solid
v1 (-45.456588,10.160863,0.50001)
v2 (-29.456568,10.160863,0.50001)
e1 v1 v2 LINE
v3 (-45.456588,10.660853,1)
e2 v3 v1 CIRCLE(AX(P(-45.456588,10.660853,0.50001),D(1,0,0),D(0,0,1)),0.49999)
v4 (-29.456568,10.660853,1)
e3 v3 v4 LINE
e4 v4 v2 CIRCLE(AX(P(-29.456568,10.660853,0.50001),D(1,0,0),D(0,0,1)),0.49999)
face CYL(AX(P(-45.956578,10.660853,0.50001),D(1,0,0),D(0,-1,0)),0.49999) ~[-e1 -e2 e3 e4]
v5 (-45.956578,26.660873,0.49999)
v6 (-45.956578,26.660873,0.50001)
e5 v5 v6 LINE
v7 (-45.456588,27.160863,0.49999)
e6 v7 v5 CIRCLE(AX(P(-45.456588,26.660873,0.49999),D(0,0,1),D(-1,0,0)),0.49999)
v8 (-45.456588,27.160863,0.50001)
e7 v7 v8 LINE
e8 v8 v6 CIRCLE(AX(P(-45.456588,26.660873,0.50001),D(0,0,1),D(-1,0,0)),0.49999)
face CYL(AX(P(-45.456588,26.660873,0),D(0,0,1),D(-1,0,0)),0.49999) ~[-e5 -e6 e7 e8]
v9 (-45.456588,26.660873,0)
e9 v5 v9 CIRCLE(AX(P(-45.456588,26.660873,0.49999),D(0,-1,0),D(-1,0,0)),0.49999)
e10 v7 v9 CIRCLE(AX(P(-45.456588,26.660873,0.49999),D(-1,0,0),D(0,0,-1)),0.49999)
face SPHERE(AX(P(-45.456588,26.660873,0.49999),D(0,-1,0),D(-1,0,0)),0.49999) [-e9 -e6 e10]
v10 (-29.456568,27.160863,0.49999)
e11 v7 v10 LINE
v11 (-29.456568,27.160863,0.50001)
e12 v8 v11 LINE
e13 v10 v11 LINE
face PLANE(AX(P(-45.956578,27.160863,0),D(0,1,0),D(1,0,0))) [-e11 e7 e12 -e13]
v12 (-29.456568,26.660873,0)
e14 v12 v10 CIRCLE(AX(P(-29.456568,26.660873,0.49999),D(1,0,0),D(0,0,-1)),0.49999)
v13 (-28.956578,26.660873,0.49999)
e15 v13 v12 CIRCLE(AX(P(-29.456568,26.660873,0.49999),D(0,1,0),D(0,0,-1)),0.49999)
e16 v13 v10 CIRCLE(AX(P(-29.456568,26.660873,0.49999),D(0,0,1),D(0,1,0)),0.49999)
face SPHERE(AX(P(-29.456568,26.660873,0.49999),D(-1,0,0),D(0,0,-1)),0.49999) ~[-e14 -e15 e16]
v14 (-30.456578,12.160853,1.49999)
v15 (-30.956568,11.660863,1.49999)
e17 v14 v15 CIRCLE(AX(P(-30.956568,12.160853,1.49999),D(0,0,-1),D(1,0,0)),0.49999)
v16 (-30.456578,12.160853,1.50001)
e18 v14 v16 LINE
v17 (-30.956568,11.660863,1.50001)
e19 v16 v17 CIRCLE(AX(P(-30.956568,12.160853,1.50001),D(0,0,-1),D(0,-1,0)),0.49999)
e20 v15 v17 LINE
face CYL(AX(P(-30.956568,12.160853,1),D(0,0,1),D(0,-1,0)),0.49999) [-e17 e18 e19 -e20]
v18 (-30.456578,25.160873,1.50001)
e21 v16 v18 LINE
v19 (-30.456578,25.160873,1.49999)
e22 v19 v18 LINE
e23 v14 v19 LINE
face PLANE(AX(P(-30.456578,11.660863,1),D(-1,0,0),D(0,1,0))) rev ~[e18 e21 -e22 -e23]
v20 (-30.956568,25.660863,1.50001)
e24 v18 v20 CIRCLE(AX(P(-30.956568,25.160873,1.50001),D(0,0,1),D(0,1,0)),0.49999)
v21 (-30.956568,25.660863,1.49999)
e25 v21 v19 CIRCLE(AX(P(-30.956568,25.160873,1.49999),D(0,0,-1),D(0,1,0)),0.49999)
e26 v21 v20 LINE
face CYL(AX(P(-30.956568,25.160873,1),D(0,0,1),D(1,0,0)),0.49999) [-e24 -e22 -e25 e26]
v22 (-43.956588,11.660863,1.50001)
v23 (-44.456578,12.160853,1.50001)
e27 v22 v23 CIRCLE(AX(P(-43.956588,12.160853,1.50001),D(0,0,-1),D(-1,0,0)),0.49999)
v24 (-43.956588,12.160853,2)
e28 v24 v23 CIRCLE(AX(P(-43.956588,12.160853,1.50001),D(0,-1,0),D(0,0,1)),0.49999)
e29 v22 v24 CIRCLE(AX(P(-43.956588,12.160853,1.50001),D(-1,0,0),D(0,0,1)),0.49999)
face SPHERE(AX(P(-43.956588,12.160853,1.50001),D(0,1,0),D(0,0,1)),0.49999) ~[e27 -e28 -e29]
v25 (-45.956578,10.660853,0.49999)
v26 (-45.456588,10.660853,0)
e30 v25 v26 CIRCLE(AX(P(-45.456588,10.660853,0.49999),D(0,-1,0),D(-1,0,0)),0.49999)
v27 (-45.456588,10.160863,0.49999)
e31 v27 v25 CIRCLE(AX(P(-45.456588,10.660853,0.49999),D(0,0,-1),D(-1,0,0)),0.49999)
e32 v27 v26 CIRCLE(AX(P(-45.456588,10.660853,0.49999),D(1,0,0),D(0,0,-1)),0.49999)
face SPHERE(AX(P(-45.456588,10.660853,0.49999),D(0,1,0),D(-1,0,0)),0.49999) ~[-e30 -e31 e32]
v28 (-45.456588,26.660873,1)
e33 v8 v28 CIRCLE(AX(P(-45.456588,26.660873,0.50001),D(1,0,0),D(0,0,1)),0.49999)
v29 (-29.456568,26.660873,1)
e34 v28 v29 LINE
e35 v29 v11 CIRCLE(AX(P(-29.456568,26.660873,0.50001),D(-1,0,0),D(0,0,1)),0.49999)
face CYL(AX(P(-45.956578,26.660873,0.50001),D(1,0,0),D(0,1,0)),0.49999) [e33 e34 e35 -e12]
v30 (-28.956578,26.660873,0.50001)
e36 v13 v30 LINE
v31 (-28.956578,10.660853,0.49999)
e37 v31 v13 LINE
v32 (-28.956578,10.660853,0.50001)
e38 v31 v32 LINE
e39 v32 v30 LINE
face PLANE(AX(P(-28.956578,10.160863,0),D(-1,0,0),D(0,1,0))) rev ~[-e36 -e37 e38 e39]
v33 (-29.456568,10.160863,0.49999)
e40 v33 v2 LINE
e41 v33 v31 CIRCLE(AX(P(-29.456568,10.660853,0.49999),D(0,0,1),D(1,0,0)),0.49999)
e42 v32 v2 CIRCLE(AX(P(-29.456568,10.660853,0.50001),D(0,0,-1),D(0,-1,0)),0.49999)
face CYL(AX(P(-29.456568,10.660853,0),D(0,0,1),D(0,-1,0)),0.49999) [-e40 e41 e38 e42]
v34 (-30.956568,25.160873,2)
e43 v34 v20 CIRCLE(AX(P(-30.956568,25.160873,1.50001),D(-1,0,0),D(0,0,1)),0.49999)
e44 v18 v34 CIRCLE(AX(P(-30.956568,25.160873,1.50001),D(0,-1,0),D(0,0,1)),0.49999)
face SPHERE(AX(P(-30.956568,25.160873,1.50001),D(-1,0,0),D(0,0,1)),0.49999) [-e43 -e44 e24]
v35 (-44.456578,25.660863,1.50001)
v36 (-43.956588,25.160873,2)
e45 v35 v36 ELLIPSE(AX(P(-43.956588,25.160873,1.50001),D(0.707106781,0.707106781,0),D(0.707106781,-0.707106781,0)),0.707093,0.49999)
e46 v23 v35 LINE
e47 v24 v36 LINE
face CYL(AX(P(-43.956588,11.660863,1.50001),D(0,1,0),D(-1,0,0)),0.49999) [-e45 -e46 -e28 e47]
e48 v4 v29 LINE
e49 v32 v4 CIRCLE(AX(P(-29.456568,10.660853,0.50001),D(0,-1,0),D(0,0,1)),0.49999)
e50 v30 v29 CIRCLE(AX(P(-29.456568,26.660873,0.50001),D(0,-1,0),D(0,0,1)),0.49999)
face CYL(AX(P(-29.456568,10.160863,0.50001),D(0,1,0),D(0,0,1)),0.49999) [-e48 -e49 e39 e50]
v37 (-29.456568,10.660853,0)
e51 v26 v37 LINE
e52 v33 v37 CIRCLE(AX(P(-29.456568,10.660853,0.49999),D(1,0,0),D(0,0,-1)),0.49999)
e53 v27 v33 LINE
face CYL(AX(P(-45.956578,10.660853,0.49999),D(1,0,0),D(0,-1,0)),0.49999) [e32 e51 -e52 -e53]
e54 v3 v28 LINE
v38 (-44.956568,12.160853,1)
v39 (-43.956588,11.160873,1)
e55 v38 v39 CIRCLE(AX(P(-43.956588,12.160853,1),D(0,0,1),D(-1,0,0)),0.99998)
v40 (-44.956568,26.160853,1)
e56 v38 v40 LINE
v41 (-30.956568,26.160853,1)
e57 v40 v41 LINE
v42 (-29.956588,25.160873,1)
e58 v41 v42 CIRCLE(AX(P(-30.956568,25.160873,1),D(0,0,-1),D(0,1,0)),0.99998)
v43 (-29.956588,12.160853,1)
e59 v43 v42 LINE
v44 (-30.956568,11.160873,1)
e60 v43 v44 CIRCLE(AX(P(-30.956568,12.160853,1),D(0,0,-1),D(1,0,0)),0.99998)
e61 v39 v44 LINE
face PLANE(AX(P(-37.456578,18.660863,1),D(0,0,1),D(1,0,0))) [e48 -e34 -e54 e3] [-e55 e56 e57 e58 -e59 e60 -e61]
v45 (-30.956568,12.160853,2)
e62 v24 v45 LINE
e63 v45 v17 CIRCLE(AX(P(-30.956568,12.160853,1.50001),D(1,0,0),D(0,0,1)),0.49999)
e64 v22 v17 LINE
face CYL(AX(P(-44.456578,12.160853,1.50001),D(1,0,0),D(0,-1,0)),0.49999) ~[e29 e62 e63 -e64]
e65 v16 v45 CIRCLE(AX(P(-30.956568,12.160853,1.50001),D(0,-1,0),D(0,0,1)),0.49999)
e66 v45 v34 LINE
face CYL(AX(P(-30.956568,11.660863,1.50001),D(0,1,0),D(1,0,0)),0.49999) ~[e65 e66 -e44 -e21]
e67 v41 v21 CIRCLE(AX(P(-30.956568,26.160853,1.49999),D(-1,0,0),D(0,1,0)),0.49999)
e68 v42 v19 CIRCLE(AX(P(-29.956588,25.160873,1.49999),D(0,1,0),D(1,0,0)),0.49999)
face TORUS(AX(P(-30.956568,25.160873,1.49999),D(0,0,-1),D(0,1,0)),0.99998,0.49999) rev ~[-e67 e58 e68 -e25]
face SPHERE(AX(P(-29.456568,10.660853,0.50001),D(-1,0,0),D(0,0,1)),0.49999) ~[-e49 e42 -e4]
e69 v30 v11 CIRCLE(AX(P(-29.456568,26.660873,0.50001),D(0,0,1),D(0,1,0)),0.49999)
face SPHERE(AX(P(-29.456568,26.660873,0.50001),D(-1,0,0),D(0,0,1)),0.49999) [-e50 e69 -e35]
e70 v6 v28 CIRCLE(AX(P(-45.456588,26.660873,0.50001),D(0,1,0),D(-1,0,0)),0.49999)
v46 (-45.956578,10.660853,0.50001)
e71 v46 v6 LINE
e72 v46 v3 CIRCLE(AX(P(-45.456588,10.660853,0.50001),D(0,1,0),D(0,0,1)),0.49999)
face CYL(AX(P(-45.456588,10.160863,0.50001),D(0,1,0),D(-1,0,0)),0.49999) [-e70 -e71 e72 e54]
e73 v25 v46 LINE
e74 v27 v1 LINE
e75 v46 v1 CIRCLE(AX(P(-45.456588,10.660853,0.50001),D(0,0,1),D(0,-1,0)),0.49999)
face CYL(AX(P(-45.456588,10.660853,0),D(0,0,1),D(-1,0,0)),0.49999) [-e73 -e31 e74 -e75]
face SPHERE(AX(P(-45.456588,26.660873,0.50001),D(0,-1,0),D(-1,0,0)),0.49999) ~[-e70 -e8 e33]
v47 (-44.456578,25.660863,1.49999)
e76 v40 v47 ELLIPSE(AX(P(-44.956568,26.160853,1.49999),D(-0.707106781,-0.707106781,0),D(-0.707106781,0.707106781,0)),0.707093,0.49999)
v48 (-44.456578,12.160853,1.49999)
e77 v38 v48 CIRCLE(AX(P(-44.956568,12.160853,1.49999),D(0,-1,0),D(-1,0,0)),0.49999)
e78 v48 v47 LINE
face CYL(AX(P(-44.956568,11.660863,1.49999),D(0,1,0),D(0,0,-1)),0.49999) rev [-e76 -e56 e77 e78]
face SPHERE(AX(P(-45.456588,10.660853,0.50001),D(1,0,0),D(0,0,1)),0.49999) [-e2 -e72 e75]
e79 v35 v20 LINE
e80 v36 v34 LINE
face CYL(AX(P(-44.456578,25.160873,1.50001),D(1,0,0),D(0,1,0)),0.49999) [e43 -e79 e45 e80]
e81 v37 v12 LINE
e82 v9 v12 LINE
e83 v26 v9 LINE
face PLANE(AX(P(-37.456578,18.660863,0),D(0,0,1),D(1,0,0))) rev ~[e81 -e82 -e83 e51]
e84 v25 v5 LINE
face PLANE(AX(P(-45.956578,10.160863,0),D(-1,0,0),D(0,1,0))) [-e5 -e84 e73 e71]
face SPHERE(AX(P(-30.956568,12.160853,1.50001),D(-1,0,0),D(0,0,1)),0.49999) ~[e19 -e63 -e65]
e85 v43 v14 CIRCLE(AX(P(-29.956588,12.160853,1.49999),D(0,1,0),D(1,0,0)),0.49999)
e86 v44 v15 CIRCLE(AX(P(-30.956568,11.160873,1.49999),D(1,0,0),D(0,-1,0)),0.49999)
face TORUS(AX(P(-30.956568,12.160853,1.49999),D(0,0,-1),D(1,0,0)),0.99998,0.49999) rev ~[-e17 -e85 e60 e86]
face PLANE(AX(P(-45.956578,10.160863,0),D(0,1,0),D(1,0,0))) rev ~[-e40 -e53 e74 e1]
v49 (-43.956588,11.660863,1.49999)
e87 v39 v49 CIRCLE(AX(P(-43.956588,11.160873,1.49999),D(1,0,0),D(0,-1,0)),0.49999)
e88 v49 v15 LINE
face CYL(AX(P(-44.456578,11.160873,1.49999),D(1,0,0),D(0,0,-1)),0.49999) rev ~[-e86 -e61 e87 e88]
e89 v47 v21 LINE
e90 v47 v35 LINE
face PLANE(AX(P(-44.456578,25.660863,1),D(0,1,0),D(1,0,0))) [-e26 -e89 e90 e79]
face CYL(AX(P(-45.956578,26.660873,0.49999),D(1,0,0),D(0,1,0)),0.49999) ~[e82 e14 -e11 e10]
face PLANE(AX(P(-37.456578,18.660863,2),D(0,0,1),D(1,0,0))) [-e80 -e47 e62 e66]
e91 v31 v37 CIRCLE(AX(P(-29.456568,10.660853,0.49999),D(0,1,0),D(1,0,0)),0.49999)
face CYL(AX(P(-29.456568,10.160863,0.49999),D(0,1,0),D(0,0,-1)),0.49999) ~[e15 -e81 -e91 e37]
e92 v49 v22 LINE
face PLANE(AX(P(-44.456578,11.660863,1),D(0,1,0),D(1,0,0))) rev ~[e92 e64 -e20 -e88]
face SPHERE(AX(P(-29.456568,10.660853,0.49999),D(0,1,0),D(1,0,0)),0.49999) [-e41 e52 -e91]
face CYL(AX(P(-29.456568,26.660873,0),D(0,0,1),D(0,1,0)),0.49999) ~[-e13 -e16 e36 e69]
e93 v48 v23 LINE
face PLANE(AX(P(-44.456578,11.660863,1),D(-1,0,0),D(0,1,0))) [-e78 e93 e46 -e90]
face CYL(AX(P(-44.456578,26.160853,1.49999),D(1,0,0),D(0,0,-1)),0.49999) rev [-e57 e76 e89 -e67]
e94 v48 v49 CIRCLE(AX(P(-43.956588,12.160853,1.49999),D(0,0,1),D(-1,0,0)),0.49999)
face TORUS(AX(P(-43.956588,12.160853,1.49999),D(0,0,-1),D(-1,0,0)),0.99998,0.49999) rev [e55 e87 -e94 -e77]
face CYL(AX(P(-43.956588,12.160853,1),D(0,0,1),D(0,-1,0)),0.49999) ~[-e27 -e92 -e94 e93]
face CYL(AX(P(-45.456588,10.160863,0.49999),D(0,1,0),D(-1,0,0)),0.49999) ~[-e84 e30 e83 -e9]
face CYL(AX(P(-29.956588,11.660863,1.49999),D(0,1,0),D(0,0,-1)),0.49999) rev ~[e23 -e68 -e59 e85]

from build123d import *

# Parameters (mm, degrees)
F0_W     = 17
F0_H     = 17
F1_DEPTH = 1
F2_W     = 14
F2_H     = 14
F3_DEPTH = 1
F4_R     = 0.49999


# Not quite as in the source:
# - a fillet or chamfer is up to 0.001 mm smaller than in the source, because OpenCascade refuses the exact size


with BuildPart() as f1:
    # F0 (on Top) → F1 (new body)
    with BuildSketch(Plane.XY):
        with Locations((-37.4565784931, 18.6608627687)):
            Rectangle(F0_W, F0_H)
    extrude(amount=F1_DEPTH)

    # F2 (on face) → F3 (join)
    with BuildSketch(Plane.XY.offset(1)):
        with Locations((-37.4565784931, 18.6608627687)):
            Rectangle(F2_W, F2_H)
    extrude(amount=F3_DEPTH)

    # F4 (radius 0.5 in the source; OpenCascade refuses exactly that, so slightly less here)
    f4_edges = [f1.edges().sort_by_distance(p)[0] for p in [
        (-37.456578, 25.660863, 2),
        (-44.456578, 18.660863, 2),
        (-44.456578, 18.660863, 1),
        (-37.456578, 25.660863, 1),
        (-37.456578, 11.660863, 2),
        (-37.456578, 10.160863, 1),
        (-45.956578, 18.660863, 1),
        (-45.956578, 18.660863, 0),
        (-45.956578, 27.160863, 0.5),
        (-37.456578, 27.160863, 1),
        (-37.456578, 27.160863, 0),
        (-30.456578, 18.660863, 1),
        (-30.456578, 18.660863, 2),
        (-30.456578, 25.660863, 1.5),
        (-28.956578, 18.660863, 1),
        (-28.956578, 18.660863, 0),
        (-28.956578, 27.160863, 0.5),
        (-28.956578, 10.160863, 0.5),
        (-45.956578, 10.160863, 0.5),
        (-37.456578, 10.160863, 0),
        (-37.456578, 11.660863, 1),
        (-44.456578, 11.660863, 1.5),
        (-30.456578, 11.660863, 1.5),
    ]]
    fillet(f4_edges, radius=F4_R)


solid = f1.part
